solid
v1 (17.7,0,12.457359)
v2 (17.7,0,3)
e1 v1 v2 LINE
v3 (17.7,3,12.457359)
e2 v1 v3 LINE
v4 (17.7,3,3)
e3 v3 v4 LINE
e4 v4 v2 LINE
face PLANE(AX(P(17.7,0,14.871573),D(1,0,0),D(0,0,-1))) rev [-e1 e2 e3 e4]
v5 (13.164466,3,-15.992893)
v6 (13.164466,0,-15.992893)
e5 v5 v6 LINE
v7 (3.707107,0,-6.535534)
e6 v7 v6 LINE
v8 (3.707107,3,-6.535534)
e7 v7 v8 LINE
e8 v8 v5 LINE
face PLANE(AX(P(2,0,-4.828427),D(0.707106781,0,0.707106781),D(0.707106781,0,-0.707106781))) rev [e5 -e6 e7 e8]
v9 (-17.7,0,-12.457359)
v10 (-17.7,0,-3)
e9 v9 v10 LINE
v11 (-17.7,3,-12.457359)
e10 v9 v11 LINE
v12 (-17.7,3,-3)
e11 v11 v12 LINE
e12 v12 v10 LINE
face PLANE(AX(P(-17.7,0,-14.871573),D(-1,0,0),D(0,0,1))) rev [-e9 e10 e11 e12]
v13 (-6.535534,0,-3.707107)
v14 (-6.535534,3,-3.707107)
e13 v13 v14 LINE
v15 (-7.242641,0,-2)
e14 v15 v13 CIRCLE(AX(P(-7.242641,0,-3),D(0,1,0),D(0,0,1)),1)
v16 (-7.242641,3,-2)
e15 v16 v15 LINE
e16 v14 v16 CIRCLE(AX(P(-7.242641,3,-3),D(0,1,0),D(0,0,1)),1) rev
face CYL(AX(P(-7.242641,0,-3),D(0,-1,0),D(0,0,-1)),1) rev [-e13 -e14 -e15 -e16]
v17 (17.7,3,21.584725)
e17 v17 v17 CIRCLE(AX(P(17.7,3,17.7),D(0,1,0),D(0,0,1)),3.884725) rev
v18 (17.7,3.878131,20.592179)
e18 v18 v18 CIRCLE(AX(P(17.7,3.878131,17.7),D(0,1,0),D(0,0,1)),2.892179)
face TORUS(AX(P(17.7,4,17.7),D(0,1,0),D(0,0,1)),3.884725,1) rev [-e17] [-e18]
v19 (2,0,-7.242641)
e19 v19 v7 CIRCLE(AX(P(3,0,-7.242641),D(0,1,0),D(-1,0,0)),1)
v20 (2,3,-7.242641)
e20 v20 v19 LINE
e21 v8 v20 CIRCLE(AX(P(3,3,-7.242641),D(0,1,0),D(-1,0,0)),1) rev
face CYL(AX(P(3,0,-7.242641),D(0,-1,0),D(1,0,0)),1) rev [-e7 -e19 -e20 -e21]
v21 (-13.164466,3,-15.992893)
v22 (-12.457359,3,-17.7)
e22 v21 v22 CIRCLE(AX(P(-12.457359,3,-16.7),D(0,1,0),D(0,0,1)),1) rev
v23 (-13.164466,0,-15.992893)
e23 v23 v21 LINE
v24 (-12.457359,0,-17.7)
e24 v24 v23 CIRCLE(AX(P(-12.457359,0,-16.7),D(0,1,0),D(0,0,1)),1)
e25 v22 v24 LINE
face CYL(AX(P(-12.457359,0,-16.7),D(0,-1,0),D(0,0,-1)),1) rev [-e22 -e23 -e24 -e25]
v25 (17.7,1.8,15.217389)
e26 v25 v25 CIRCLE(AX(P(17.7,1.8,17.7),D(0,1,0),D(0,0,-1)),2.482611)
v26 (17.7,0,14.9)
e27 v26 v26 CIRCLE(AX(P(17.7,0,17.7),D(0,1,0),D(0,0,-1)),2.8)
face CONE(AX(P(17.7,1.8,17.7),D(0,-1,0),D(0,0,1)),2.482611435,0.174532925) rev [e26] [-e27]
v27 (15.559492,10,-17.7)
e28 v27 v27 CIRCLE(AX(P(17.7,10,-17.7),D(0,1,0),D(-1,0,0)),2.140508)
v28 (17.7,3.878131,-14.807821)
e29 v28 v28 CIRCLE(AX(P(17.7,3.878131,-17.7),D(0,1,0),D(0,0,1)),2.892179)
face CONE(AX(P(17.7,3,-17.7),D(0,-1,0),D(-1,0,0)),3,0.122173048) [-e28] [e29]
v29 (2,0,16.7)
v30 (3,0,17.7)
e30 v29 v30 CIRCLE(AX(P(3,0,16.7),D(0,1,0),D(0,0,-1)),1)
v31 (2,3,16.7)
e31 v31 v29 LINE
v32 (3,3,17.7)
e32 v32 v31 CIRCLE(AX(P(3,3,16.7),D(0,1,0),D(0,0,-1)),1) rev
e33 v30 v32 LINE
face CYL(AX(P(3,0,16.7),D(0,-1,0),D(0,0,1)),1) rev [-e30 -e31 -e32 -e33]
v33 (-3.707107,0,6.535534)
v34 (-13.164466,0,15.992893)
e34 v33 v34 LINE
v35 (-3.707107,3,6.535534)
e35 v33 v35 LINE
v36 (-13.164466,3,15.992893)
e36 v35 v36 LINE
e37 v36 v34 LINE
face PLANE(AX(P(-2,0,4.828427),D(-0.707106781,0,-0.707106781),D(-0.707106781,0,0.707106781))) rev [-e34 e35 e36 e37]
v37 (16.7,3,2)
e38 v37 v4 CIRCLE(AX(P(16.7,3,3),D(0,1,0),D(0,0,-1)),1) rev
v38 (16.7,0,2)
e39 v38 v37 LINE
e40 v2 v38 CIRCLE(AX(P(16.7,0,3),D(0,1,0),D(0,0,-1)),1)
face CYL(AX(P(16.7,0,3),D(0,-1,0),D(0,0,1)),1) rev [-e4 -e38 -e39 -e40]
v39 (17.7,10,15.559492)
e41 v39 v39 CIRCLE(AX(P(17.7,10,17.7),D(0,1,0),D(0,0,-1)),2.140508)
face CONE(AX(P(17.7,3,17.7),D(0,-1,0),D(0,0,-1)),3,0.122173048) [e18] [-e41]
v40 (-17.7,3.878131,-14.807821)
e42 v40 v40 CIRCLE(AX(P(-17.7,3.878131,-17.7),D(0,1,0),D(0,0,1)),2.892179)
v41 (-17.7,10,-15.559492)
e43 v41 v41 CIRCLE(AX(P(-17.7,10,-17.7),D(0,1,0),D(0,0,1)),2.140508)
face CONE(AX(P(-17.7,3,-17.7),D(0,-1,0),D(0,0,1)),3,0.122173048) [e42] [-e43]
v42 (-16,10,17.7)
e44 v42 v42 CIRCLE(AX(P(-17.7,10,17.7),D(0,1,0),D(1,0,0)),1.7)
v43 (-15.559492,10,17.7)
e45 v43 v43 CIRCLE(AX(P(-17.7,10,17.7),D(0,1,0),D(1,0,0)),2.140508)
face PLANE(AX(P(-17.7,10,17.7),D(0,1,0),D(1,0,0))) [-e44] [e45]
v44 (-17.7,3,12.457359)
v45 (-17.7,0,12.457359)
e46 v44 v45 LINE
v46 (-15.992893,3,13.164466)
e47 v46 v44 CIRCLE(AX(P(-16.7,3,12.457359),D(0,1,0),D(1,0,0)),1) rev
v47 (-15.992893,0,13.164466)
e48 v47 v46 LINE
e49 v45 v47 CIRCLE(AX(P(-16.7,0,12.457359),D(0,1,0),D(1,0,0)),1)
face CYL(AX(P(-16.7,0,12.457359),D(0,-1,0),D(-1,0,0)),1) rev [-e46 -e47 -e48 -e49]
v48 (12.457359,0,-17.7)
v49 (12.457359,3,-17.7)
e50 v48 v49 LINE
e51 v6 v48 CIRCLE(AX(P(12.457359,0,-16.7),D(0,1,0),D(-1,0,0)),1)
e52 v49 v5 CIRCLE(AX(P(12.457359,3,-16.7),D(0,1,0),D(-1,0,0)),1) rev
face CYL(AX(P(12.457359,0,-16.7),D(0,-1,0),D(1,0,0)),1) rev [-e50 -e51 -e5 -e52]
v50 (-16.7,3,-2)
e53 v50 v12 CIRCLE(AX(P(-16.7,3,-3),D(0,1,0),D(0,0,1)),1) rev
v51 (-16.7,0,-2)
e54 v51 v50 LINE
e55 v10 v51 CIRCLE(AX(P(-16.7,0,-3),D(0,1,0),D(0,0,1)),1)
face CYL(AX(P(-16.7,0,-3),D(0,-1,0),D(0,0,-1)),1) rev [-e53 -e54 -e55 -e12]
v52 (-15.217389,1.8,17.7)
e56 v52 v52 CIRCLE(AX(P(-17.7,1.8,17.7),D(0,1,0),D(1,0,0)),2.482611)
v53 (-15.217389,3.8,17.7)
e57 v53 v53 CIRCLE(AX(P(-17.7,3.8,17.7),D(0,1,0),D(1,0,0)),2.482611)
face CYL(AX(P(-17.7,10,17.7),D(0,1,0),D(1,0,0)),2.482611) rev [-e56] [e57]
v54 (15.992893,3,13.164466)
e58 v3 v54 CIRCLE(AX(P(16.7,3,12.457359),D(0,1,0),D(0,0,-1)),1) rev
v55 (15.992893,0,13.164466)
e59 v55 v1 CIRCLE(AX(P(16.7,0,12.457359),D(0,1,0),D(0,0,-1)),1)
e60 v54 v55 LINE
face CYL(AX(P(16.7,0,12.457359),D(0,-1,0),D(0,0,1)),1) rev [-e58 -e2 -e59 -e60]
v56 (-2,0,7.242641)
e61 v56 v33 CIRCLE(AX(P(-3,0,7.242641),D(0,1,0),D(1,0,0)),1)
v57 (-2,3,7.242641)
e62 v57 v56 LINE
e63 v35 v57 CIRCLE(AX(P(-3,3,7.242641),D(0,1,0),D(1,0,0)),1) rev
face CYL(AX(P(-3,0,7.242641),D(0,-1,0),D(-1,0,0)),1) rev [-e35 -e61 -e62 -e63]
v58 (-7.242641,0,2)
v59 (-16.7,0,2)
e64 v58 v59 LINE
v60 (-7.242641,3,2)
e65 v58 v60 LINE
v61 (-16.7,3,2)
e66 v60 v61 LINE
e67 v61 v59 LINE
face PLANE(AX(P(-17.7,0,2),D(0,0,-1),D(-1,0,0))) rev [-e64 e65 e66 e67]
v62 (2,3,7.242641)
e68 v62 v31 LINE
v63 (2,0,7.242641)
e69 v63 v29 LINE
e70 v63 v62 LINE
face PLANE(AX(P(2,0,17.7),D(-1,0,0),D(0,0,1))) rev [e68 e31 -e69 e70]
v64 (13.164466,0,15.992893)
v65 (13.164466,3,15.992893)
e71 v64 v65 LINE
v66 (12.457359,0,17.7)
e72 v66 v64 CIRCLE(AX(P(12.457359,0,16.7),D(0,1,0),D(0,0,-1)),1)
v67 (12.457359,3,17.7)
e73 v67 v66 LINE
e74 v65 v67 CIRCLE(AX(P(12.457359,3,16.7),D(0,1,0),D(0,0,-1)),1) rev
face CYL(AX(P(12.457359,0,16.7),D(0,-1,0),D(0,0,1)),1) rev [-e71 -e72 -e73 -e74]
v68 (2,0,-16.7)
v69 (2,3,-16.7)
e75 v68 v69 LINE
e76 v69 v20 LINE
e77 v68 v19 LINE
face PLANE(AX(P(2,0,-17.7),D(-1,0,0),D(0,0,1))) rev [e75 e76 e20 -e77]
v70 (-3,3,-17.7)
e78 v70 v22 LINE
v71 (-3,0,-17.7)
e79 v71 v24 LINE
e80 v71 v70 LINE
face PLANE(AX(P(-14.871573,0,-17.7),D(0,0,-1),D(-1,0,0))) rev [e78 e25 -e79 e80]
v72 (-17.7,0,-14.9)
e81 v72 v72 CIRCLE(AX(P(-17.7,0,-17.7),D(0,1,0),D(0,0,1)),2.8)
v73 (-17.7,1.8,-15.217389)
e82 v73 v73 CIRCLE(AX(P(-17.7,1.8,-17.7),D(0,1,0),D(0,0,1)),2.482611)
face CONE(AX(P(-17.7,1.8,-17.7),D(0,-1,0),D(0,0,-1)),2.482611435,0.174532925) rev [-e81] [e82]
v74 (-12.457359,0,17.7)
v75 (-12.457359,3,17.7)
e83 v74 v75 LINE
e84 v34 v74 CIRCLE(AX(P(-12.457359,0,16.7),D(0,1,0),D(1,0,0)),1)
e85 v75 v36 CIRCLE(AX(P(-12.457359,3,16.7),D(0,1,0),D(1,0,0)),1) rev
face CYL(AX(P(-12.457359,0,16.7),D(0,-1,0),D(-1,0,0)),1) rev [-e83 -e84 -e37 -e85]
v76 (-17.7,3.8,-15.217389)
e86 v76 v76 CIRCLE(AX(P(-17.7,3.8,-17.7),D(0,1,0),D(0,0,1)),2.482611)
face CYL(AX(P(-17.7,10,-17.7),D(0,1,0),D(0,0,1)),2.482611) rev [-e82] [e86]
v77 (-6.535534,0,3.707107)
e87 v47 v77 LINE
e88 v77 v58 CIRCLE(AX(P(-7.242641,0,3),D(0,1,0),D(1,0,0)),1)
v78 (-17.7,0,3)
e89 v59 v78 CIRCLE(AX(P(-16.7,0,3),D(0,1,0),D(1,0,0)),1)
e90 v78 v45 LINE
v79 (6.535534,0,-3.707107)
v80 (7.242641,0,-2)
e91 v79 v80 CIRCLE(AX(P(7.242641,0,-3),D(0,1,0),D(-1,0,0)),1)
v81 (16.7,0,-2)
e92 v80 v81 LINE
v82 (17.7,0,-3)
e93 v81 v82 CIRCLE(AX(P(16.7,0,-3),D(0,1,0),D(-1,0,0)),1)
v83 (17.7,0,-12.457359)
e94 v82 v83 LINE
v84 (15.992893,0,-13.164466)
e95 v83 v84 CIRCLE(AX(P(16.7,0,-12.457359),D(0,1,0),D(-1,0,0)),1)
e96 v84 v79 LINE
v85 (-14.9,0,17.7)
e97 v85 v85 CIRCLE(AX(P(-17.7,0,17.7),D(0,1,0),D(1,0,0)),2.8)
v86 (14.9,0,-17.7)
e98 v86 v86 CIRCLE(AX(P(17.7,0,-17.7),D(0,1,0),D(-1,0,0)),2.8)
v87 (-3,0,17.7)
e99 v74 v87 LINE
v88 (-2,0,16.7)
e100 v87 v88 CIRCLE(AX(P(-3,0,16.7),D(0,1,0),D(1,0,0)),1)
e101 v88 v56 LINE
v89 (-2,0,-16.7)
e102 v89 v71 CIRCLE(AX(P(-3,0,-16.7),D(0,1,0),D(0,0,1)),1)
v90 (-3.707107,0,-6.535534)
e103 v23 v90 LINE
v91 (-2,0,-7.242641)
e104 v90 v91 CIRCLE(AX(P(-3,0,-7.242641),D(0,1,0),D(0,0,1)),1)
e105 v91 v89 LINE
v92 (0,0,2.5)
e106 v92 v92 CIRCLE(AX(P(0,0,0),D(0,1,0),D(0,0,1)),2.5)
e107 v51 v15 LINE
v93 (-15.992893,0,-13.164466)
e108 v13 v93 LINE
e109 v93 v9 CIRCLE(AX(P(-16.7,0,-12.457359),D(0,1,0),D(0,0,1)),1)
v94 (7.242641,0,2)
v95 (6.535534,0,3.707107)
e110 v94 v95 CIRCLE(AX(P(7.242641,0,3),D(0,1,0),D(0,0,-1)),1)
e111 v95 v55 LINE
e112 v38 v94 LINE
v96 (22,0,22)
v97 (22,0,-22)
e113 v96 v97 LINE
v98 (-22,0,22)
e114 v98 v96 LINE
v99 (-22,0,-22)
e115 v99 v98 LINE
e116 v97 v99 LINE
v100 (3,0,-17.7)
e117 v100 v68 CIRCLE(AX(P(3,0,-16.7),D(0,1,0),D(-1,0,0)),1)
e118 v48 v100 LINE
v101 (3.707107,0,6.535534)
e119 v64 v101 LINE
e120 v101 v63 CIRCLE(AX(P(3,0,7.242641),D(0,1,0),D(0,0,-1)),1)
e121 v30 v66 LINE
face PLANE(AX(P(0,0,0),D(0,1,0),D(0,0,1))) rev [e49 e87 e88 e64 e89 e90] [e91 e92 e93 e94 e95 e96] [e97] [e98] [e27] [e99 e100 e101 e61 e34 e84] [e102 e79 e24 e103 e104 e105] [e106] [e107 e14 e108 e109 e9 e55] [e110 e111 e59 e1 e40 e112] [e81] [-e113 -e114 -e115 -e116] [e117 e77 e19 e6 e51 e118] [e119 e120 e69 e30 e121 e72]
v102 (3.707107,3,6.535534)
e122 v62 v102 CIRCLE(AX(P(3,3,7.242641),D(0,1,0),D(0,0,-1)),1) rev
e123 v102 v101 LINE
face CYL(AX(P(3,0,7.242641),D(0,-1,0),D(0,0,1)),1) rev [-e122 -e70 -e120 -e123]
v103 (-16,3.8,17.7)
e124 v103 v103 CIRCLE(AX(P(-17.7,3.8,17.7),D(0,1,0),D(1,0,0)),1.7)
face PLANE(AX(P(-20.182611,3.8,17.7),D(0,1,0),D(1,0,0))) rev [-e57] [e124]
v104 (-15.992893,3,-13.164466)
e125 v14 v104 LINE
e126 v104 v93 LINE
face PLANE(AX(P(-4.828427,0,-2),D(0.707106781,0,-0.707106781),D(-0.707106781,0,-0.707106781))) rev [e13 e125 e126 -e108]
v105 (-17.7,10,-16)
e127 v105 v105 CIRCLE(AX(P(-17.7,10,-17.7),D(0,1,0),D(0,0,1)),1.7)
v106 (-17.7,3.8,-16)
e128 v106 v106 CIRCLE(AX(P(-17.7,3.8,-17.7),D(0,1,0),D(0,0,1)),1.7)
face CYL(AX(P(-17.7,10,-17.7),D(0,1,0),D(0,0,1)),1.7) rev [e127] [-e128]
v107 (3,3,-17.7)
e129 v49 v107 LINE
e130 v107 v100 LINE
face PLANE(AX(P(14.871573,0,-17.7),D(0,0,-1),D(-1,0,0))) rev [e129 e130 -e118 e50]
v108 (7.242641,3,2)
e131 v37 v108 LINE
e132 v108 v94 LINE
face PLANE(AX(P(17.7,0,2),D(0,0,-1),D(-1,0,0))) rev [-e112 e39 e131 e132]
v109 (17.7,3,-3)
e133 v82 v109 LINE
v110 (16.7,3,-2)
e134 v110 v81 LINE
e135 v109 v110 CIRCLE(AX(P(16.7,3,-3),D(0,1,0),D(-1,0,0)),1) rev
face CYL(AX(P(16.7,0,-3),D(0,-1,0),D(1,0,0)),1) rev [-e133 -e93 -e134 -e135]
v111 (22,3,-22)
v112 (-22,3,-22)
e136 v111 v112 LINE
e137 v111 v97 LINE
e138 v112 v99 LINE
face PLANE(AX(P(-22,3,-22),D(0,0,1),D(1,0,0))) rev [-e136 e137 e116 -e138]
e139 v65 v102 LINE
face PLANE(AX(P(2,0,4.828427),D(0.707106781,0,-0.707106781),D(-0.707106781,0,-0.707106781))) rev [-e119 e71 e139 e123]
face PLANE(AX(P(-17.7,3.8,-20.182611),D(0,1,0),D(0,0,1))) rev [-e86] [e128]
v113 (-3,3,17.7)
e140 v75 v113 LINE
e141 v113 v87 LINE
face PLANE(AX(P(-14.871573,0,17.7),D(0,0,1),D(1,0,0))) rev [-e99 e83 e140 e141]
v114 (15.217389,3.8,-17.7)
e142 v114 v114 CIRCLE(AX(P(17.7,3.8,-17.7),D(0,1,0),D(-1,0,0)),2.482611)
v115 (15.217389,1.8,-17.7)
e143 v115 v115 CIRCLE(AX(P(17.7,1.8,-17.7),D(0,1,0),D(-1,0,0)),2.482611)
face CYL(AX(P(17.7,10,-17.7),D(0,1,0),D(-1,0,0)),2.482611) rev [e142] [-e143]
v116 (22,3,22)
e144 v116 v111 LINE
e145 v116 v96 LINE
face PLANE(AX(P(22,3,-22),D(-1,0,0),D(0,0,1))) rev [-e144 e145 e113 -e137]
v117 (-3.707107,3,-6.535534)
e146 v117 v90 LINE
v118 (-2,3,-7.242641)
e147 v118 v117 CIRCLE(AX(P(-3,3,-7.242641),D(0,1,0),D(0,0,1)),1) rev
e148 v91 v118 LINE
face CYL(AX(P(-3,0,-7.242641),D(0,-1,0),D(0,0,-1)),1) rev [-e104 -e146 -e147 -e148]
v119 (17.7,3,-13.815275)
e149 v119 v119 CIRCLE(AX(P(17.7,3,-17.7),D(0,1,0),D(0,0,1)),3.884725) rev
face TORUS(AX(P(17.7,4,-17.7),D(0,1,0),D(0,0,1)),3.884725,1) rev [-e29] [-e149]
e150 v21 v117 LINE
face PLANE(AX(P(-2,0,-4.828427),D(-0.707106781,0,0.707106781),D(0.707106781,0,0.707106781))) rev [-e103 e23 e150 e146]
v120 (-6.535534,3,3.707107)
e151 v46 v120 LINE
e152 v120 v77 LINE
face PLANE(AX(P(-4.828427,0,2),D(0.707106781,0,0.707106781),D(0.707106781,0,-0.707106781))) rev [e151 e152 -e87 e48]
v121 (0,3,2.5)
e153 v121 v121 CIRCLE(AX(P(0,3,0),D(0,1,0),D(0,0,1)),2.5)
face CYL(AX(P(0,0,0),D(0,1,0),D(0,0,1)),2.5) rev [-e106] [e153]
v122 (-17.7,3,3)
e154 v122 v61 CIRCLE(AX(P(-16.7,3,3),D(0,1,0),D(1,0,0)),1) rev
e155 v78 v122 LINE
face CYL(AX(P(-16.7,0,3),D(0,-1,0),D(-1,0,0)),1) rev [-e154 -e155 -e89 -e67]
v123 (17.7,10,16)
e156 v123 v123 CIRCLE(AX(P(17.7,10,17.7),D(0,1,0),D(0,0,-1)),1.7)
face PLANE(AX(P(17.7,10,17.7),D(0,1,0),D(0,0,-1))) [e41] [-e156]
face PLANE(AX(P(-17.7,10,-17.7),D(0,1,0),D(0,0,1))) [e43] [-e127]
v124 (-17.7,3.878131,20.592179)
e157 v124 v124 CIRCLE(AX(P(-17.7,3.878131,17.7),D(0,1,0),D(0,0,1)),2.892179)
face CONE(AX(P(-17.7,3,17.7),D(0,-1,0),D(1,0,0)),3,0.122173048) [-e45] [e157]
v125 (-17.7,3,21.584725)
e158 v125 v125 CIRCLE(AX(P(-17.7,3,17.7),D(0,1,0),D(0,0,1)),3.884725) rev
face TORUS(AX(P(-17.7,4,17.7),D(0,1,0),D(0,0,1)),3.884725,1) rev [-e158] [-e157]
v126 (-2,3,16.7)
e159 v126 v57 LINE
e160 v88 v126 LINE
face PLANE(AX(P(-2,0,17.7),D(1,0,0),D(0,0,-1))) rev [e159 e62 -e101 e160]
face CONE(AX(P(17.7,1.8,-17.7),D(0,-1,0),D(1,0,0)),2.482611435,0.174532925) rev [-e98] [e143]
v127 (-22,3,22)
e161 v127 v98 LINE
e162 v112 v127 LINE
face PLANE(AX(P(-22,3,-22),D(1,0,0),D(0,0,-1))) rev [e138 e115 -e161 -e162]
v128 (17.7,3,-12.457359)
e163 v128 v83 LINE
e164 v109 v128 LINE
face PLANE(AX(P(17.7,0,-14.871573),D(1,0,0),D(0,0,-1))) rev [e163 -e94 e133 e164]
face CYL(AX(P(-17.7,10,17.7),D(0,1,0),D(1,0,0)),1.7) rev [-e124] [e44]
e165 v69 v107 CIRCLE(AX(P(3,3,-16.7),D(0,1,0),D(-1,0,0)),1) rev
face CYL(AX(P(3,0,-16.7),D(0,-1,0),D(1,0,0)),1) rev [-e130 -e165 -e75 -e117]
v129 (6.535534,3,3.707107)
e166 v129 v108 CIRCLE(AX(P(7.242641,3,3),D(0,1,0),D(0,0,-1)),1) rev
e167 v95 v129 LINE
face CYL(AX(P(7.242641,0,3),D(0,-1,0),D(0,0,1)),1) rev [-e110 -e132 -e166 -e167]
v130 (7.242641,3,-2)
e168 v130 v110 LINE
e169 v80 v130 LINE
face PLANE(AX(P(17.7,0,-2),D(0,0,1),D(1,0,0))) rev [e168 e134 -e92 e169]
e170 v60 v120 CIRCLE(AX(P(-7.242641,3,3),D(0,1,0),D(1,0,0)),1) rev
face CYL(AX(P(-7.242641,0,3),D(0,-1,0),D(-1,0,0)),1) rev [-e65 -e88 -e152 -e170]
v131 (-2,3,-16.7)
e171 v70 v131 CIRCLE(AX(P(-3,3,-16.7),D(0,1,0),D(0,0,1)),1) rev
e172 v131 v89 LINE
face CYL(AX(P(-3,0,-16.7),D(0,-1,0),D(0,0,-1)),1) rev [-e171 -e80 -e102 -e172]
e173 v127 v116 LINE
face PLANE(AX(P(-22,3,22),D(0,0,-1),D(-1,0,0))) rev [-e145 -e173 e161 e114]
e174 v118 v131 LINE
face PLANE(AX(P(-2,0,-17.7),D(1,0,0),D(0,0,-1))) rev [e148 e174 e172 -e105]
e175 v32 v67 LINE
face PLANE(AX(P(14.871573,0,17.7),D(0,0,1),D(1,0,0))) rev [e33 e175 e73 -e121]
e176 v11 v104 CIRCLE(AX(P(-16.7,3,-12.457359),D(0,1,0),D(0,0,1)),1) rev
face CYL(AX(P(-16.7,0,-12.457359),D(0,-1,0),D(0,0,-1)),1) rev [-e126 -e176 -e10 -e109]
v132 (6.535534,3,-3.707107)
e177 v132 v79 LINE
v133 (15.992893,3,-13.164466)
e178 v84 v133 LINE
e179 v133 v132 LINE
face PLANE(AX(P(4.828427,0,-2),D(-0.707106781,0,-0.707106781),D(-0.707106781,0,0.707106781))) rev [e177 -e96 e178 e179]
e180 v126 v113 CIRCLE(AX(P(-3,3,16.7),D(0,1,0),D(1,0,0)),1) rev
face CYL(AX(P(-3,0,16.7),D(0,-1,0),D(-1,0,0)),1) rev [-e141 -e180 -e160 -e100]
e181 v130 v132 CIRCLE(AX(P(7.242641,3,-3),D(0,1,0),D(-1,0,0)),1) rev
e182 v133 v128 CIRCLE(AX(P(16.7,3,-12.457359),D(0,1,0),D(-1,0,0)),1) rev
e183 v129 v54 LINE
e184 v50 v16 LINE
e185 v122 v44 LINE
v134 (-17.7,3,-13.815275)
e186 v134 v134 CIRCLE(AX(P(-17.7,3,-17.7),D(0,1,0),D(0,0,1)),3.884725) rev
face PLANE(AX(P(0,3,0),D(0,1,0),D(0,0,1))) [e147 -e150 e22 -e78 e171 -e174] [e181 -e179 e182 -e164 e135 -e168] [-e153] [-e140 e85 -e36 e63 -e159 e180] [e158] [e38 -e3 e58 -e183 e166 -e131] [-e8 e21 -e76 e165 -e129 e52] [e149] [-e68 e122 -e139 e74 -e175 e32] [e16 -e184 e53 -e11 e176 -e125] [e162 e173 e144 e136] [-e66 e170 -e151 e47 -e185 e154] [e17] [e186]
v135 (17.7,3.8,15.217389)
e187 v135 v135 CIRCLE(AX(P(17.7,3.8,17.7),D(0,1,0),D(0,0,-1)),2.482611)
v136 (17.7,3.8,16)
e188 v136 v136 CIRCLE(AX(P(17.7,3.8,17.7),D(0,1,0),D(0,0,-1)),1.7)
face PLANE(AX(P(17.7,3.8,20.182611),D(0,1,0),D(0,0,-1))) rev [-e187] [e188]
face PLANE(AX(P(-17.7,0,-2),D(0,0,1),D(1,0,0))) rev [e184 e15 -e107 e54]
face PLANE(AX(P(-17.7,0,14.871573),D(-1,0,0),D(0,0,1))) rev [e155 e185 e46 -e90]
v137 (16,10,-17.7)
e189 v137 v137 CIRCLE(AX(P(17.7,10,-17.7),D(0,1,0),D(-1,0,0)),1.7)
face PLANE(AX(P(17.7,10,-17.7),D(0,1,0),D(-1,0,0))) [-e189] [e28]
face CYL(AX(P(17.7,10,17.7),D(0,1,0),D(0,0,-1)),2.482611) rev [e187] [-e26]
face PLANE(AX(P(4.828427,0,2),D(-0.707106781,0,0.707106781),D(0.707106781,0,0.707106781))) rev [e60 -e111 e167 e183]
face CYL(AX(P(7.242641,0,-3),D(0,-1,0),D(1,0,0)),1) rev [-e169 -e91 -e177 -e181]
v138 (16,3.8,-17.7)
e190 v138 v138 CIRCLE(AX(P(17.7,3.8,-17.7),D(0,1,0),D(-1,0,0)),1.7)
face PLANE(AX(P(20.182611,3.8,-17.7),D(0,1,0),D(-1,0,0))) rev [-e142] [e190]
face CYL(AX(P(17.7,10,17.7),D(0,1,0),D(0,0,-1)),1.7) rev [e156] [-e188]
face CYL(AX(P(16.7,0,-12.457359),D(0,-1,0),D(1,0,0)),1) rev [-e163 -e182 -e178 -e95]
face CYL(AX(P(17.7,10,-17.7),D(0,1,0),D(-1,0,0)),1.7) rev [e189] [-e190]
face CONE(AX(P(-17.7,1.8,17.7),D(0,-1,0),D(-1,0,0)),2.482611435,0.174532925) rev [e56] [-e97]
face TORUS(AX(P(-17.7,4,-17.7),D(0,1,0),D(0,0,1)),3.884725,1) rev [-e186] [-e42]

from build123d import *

# Parameters (mm, degrees)
SKETCH1_W                = 44
SKETCH1_H                = 44
BOSS_EXTRUDE1_DEPTH      = 3
SKETCH2_R                = 3
BOSS_EXTRUDE2_DEPTH      = 7
BOSS_EXTRUDE2_TAPER      = 7
SKETCH4_R                = 2.5
CUT_EXTRUDE1_DEPTH       = 32.89043746
FILLET2_R                = 1
CIRPATTERN1_COUNT        = 4
FILLET2_OF_CIRPATTERN1_R = 1
FILLET3_R                = 1


with BuildPart() as part:
    # Sketch1 → Boss-Extrude1 (new body)
    with BuildSketch(Plane(origin=(0, 0, 0), x_dir=(1, 0, 0), z_dir=(0, 1, 0))):
        Rectangle(SKETCH1_W, SKETCH1_H)
    extrude(amount=BOSS_EXTRUDE1_DEPTH)

    # Sketch2 → Boss-Extrude2 (add)
    with BuildSketch(Plane(origin=(0, 3, 0), x_dir=(1, 0, 0), z_dir=(0, 1, 0))):
        with Locations((-17.7, 17.7)):
            Circle(SKETCH2_R)
    boss_extrude2 = extrude(amount=BOSS_EXTRUDE2_DEPTH, taper=BOSS_EXTRUDE2_TAPER)

    # Sketch3 → Cut-Revolve1 (revolve, cut)
    with BuildSketch(Plane(origin=(-17.7, 0, 0), x_dir=(0, 1, 0), z_dir=(-1, 0, 0)), mode=Mode.PRIVATE) as cut_revolve1_sk:
        Polygon((0, 17.7), (0, 20.5), (1.8, 20.182611435), (3.8, 20.182611435), (3.8, 19.4), (10, 19.4), (10, 17.7), align=None)
    cut_revolve1 = revolve(cut_revolve1_sk.sketch.rotate(Axis((-17.7, 10, -17.7), (0, -1, 0)), 180), axis=Axis((-17.7, 10, -17.7), (0, -1, 0)), mode=Mode.SUBTRACT)

    # Sketch4 → Cut-Extrude1 (cut, through all)
    with BuildSketch(Plane(origin=(0, 3, 0), x_dir=(1, 0, 0), z_dir=(0, 1, 0))):
        with Locations(Location((0, 0, 0), (0, 0, 270))):
            Circle(SKETCH4_R)
        Polygon((-14.871572875, 17.7), (-2, 17.7), (-2, 4.828427125), align=None)
        Polygon((-17.7, 2), (-4.828427125, 2), (-17.7, 14.871572875), align=None)
    cut_extrude1 = extrude(amount=-CUT_EXTRUDE1_DEPTH, mode=Mode.SUBTRACT)

    # Fillet2
    # the kernel refuses this fillet: 1 mm, written as the material it adds along each edge
    with BuildSketch(Plane(origin=(-2, 3, -4.828427125), x_dir=(0, 0, -1), z_dir=(0, -1, 0)), Plane(origin=(-14.871572875, 3, -17.7), x_dir=(0.7071067811865476, 0, 0.7071067811865476), z_dir=(0, -1, 0)), Plane(origin=(-17.7, 3, -14.871572875), x_dir=(0, 0, 1), z_dir=(0, -1, 0))) as fillet2_piece_1:
        with BuildLine():
            CenterArc((FILLET2_R * 2.41421356237, -FILLET2_R), FILLET2_R, 90, 135)
            Line((FILLET2_R * 1.70710678119, -FILLET2_R * 1.70710678119), (0, 0))
            Line((0, 0), (FILLET2_R * 2.41421356237, 0))
        make_face()
    extrude(amount=3)
    with BuildSketch(Plane(origin=(-2, 3, -17.7), x_dir=(0, 0, 1), z_dir=(0, -1, 0))) as fillet2_piece_2:
        with BuildLine():
            CenterArc((FILLET2_R, FILLET2_R), FILLET2_R, 180, 90)
            Line((0, FILLET2_R), (0, 0))
            Line((0, 0), (FILLET2_R, 0))
        make_face()
    extrude(amount=3)
    with BuildSketch(Plane(origin=(-17.7, 3, -2), x_dir=(1, 0, 0), z_dir=(0, -1, 0))) as fillet2_piece_3:
        with BuildLine():
            CenterArc((FILLET2_R, -FILLET2_R), FILLET2_R, 90, 90)
            Line((0, -FILLET2_R), (0, 0))
            Line((0, 0), (FILLET2_R, 0))
        make_face()
    extrude(amount=3)
    with BuildSketch(Plane(origin=(-4.828427125, 3, -2), x_dir=(-1, 0, 0), z_dir=(0, -1, 0))) as fillet2_piece_4:
        with BuildLine():
            CenterArc((FILLET2_R * 2.41421356237, FILLET2_R), FILLET2_R, 135, 135)
            Line((FILLET2_R * 1.70710678119, FILLET2_R * 1.70710678119), (0, 0))
            Line((0, 0), (FILLET2_R * 2.41421356237, 0))
        make_face()
    extrude(amount=3)

    # CirPattern1: Boss-Extrude2, Cut-Revolve1, Cut-Extrude1 ×4 about axis
    cirpattern1_axis = Axis((0, 0, 0), (0, 1, 0))
    add([boss_extrude2.rotate(cirpattern1_axis, i * 360 / CIRPATTERN1_COUNT) for i in range(1, CIRPATTERN1_COUNT)])
    add([cut_revolve1.rotate(cirpattern1_axis, i * 360 / CIRPATTERN1_COUNT) for i in range(1, CIRPATTERN1_COUNT)], mode=Mode.SUBTRACT)
    add([cut_extrude1.rotate(cirpattern1_axis, i * 360 / CIRPATTERN1_COUNT) for i in range(1, CIRPATTERN1_COUNT)], mode=Mode.SUBTRACT)

    # Fillet2 of CirPattern1
    # the kernel refuses this fillet: 1 mm, written as the material it adds along each edge
    with BuildSketch(Plane(origin=(-4.828427125, 3, 2), x_dir=(-1, 0, 0), z_dir=(0, -1, 0)), Plane(origin=(-2, 3, 4.828427125), x_dir=(-0.7071067811865477, 0, 0.7071067811865475), z_dir=(0, -1, 0)), Plane(origin=(2, 3, 4.828427125), x_dir=(0, 0, 1), z_dir=(0, -1, 0)), Plane(origin=(4.828427125, 3, 2), x_dir=(0.7071067811865475, 0, 0.7071067811865475), z_dir=(0, -1, 0)), Plane(origin=(4.828427125, 3, -2), x_dir=(1, 0, 0), z_dir=(0, -1, 0)), Plane(origin=(2, 3, -4.828427125), x_dir=(0.7071067811865476, 0, -0.7071067811865476), z_dir=(0, -1, 0))) as fillet2_of_cirpattern1_piece_1:
        with BuildLine():
            CenterArc((FILLET2_OF_CIRPATTERN1_R * 2.41421356237, -FILLET2_OF_CIRPATTERN1_R), FILLET2_OF_CIRPATTERN1_R, 90, 135)
            Line((FILLET2_OF_CIRPATTERN1_R * 1.70710678119, -FILLET2_OF_CIRPATTERN1_R * 1.70710678119), (0, 0))
            Line((0, 0), (FILLET2_OF_CIRPATTERN1_R * 2.41421356237, 0))
        make_face()
    extrude(amount=3)
    with BuildSketch(Plane(origin=(-17.7, 3, 14.871572875), x_dir=(0, 0, -1), z_dir=(0, -1, 0)), Plane(origin=(-14.871572875, 3, 17.7), x_dir=(0.7071067811865471, 0, -0.7071067811865479), z_dir=(0, -1, 0)), Plane(origin=(14.871572875, 3, 17.7), x_dir=(-1, 0, 0), z_dir=(0, -1, 0)), Plane(origin=(17.7, 3, 14.871572875), x_dir=(-0.7071067811865469, 0, -0.7071067811865483), z_dir=(0, -1, 0)), Plane(origin=(17.7, 3, -14.871572875), x_dir=(0, 0, 1), z_dir=(0, -1, 0)), Plane(origin=(14.871572875, 3, -17.7), x_dir=(-0.7071067811865487, 0, 0.7071067811865465), z_dir=(0, -1, 0))) as fillet2_of_cirpattern1_piece_2:
        with BuildLine():
            CenterArc((FILLET2_OF_CIRPATTERN1_R * 2.41421356237, FILLET2_OF_CIRPATTERN1_R), FILLET2_OF_CIRPATTERN1_R, 135, 135)
            Line((FILLET2_OF_CIRPATTERN1_R * 1.70710678119, FILLET2_OF_CIRPATTERN1_R * 1.70710678119), (0, 0))
            Line((0, 0), (FILLET2_OF_CIRPATTERN1_R * 2.41421356237, 0))
        make_face()
    extrude(amount=3)
    with BuildSketch(Plane(origin=(-17.7, 3, 2), x_dir=(1, 0, 0), z_dir=(0, -1, 0)), Plane(origin=(-2, 3, 17.7), x_dir=(-1, 0, 0), z_dir=(0, -1, 0)), Plane(origin=(2, 3, 17.7), x_dir=(0, 0, -1), z_dir=(0, -1, 0)), Plane(origin=(17.7, 3, 2), x_dir=(0, 0, 1), z_dir=(0, -1, 0)), Plane(origin=(17.7, 3, -2), x_dir=(-1, 0, 0), z_dir=(0, -1, 0)), Plane(origin=(2, 3, -17.7), x_dir=(1, 0, 0), z_dir=(0, -1, 0))) as fillet2_of_cirpattern1_piece_3:
        with BuildLine():
            CenterArc((FILLET2_OF_CIRPATTERN1_R, FILLET2_OF_CIRPATTERN1_R), FILLET2_OF_CIRPATTERN1_R, 180, 90)
            Line((0, FILLET2_OF_CIRPATTERN1_R), (0, 0))
            Line((0, 0), (FILLET2_OF_CIRPATTERN1_R, 0))
        make_face()
    extrude(amount=3)

    # Fillet3
    fillet3_edges = [part.edges().sort_by_distance(p)[0] for p in [
        (-17.7, 3, 20.7),
        (20.7, 3, 17.7),
        (17.7, 3, -20.7),
        (-20.7, 3, -17.7),
    ]]
    fillet(fillet3_edges, radius=FILLET3_R)


solid = part.part
